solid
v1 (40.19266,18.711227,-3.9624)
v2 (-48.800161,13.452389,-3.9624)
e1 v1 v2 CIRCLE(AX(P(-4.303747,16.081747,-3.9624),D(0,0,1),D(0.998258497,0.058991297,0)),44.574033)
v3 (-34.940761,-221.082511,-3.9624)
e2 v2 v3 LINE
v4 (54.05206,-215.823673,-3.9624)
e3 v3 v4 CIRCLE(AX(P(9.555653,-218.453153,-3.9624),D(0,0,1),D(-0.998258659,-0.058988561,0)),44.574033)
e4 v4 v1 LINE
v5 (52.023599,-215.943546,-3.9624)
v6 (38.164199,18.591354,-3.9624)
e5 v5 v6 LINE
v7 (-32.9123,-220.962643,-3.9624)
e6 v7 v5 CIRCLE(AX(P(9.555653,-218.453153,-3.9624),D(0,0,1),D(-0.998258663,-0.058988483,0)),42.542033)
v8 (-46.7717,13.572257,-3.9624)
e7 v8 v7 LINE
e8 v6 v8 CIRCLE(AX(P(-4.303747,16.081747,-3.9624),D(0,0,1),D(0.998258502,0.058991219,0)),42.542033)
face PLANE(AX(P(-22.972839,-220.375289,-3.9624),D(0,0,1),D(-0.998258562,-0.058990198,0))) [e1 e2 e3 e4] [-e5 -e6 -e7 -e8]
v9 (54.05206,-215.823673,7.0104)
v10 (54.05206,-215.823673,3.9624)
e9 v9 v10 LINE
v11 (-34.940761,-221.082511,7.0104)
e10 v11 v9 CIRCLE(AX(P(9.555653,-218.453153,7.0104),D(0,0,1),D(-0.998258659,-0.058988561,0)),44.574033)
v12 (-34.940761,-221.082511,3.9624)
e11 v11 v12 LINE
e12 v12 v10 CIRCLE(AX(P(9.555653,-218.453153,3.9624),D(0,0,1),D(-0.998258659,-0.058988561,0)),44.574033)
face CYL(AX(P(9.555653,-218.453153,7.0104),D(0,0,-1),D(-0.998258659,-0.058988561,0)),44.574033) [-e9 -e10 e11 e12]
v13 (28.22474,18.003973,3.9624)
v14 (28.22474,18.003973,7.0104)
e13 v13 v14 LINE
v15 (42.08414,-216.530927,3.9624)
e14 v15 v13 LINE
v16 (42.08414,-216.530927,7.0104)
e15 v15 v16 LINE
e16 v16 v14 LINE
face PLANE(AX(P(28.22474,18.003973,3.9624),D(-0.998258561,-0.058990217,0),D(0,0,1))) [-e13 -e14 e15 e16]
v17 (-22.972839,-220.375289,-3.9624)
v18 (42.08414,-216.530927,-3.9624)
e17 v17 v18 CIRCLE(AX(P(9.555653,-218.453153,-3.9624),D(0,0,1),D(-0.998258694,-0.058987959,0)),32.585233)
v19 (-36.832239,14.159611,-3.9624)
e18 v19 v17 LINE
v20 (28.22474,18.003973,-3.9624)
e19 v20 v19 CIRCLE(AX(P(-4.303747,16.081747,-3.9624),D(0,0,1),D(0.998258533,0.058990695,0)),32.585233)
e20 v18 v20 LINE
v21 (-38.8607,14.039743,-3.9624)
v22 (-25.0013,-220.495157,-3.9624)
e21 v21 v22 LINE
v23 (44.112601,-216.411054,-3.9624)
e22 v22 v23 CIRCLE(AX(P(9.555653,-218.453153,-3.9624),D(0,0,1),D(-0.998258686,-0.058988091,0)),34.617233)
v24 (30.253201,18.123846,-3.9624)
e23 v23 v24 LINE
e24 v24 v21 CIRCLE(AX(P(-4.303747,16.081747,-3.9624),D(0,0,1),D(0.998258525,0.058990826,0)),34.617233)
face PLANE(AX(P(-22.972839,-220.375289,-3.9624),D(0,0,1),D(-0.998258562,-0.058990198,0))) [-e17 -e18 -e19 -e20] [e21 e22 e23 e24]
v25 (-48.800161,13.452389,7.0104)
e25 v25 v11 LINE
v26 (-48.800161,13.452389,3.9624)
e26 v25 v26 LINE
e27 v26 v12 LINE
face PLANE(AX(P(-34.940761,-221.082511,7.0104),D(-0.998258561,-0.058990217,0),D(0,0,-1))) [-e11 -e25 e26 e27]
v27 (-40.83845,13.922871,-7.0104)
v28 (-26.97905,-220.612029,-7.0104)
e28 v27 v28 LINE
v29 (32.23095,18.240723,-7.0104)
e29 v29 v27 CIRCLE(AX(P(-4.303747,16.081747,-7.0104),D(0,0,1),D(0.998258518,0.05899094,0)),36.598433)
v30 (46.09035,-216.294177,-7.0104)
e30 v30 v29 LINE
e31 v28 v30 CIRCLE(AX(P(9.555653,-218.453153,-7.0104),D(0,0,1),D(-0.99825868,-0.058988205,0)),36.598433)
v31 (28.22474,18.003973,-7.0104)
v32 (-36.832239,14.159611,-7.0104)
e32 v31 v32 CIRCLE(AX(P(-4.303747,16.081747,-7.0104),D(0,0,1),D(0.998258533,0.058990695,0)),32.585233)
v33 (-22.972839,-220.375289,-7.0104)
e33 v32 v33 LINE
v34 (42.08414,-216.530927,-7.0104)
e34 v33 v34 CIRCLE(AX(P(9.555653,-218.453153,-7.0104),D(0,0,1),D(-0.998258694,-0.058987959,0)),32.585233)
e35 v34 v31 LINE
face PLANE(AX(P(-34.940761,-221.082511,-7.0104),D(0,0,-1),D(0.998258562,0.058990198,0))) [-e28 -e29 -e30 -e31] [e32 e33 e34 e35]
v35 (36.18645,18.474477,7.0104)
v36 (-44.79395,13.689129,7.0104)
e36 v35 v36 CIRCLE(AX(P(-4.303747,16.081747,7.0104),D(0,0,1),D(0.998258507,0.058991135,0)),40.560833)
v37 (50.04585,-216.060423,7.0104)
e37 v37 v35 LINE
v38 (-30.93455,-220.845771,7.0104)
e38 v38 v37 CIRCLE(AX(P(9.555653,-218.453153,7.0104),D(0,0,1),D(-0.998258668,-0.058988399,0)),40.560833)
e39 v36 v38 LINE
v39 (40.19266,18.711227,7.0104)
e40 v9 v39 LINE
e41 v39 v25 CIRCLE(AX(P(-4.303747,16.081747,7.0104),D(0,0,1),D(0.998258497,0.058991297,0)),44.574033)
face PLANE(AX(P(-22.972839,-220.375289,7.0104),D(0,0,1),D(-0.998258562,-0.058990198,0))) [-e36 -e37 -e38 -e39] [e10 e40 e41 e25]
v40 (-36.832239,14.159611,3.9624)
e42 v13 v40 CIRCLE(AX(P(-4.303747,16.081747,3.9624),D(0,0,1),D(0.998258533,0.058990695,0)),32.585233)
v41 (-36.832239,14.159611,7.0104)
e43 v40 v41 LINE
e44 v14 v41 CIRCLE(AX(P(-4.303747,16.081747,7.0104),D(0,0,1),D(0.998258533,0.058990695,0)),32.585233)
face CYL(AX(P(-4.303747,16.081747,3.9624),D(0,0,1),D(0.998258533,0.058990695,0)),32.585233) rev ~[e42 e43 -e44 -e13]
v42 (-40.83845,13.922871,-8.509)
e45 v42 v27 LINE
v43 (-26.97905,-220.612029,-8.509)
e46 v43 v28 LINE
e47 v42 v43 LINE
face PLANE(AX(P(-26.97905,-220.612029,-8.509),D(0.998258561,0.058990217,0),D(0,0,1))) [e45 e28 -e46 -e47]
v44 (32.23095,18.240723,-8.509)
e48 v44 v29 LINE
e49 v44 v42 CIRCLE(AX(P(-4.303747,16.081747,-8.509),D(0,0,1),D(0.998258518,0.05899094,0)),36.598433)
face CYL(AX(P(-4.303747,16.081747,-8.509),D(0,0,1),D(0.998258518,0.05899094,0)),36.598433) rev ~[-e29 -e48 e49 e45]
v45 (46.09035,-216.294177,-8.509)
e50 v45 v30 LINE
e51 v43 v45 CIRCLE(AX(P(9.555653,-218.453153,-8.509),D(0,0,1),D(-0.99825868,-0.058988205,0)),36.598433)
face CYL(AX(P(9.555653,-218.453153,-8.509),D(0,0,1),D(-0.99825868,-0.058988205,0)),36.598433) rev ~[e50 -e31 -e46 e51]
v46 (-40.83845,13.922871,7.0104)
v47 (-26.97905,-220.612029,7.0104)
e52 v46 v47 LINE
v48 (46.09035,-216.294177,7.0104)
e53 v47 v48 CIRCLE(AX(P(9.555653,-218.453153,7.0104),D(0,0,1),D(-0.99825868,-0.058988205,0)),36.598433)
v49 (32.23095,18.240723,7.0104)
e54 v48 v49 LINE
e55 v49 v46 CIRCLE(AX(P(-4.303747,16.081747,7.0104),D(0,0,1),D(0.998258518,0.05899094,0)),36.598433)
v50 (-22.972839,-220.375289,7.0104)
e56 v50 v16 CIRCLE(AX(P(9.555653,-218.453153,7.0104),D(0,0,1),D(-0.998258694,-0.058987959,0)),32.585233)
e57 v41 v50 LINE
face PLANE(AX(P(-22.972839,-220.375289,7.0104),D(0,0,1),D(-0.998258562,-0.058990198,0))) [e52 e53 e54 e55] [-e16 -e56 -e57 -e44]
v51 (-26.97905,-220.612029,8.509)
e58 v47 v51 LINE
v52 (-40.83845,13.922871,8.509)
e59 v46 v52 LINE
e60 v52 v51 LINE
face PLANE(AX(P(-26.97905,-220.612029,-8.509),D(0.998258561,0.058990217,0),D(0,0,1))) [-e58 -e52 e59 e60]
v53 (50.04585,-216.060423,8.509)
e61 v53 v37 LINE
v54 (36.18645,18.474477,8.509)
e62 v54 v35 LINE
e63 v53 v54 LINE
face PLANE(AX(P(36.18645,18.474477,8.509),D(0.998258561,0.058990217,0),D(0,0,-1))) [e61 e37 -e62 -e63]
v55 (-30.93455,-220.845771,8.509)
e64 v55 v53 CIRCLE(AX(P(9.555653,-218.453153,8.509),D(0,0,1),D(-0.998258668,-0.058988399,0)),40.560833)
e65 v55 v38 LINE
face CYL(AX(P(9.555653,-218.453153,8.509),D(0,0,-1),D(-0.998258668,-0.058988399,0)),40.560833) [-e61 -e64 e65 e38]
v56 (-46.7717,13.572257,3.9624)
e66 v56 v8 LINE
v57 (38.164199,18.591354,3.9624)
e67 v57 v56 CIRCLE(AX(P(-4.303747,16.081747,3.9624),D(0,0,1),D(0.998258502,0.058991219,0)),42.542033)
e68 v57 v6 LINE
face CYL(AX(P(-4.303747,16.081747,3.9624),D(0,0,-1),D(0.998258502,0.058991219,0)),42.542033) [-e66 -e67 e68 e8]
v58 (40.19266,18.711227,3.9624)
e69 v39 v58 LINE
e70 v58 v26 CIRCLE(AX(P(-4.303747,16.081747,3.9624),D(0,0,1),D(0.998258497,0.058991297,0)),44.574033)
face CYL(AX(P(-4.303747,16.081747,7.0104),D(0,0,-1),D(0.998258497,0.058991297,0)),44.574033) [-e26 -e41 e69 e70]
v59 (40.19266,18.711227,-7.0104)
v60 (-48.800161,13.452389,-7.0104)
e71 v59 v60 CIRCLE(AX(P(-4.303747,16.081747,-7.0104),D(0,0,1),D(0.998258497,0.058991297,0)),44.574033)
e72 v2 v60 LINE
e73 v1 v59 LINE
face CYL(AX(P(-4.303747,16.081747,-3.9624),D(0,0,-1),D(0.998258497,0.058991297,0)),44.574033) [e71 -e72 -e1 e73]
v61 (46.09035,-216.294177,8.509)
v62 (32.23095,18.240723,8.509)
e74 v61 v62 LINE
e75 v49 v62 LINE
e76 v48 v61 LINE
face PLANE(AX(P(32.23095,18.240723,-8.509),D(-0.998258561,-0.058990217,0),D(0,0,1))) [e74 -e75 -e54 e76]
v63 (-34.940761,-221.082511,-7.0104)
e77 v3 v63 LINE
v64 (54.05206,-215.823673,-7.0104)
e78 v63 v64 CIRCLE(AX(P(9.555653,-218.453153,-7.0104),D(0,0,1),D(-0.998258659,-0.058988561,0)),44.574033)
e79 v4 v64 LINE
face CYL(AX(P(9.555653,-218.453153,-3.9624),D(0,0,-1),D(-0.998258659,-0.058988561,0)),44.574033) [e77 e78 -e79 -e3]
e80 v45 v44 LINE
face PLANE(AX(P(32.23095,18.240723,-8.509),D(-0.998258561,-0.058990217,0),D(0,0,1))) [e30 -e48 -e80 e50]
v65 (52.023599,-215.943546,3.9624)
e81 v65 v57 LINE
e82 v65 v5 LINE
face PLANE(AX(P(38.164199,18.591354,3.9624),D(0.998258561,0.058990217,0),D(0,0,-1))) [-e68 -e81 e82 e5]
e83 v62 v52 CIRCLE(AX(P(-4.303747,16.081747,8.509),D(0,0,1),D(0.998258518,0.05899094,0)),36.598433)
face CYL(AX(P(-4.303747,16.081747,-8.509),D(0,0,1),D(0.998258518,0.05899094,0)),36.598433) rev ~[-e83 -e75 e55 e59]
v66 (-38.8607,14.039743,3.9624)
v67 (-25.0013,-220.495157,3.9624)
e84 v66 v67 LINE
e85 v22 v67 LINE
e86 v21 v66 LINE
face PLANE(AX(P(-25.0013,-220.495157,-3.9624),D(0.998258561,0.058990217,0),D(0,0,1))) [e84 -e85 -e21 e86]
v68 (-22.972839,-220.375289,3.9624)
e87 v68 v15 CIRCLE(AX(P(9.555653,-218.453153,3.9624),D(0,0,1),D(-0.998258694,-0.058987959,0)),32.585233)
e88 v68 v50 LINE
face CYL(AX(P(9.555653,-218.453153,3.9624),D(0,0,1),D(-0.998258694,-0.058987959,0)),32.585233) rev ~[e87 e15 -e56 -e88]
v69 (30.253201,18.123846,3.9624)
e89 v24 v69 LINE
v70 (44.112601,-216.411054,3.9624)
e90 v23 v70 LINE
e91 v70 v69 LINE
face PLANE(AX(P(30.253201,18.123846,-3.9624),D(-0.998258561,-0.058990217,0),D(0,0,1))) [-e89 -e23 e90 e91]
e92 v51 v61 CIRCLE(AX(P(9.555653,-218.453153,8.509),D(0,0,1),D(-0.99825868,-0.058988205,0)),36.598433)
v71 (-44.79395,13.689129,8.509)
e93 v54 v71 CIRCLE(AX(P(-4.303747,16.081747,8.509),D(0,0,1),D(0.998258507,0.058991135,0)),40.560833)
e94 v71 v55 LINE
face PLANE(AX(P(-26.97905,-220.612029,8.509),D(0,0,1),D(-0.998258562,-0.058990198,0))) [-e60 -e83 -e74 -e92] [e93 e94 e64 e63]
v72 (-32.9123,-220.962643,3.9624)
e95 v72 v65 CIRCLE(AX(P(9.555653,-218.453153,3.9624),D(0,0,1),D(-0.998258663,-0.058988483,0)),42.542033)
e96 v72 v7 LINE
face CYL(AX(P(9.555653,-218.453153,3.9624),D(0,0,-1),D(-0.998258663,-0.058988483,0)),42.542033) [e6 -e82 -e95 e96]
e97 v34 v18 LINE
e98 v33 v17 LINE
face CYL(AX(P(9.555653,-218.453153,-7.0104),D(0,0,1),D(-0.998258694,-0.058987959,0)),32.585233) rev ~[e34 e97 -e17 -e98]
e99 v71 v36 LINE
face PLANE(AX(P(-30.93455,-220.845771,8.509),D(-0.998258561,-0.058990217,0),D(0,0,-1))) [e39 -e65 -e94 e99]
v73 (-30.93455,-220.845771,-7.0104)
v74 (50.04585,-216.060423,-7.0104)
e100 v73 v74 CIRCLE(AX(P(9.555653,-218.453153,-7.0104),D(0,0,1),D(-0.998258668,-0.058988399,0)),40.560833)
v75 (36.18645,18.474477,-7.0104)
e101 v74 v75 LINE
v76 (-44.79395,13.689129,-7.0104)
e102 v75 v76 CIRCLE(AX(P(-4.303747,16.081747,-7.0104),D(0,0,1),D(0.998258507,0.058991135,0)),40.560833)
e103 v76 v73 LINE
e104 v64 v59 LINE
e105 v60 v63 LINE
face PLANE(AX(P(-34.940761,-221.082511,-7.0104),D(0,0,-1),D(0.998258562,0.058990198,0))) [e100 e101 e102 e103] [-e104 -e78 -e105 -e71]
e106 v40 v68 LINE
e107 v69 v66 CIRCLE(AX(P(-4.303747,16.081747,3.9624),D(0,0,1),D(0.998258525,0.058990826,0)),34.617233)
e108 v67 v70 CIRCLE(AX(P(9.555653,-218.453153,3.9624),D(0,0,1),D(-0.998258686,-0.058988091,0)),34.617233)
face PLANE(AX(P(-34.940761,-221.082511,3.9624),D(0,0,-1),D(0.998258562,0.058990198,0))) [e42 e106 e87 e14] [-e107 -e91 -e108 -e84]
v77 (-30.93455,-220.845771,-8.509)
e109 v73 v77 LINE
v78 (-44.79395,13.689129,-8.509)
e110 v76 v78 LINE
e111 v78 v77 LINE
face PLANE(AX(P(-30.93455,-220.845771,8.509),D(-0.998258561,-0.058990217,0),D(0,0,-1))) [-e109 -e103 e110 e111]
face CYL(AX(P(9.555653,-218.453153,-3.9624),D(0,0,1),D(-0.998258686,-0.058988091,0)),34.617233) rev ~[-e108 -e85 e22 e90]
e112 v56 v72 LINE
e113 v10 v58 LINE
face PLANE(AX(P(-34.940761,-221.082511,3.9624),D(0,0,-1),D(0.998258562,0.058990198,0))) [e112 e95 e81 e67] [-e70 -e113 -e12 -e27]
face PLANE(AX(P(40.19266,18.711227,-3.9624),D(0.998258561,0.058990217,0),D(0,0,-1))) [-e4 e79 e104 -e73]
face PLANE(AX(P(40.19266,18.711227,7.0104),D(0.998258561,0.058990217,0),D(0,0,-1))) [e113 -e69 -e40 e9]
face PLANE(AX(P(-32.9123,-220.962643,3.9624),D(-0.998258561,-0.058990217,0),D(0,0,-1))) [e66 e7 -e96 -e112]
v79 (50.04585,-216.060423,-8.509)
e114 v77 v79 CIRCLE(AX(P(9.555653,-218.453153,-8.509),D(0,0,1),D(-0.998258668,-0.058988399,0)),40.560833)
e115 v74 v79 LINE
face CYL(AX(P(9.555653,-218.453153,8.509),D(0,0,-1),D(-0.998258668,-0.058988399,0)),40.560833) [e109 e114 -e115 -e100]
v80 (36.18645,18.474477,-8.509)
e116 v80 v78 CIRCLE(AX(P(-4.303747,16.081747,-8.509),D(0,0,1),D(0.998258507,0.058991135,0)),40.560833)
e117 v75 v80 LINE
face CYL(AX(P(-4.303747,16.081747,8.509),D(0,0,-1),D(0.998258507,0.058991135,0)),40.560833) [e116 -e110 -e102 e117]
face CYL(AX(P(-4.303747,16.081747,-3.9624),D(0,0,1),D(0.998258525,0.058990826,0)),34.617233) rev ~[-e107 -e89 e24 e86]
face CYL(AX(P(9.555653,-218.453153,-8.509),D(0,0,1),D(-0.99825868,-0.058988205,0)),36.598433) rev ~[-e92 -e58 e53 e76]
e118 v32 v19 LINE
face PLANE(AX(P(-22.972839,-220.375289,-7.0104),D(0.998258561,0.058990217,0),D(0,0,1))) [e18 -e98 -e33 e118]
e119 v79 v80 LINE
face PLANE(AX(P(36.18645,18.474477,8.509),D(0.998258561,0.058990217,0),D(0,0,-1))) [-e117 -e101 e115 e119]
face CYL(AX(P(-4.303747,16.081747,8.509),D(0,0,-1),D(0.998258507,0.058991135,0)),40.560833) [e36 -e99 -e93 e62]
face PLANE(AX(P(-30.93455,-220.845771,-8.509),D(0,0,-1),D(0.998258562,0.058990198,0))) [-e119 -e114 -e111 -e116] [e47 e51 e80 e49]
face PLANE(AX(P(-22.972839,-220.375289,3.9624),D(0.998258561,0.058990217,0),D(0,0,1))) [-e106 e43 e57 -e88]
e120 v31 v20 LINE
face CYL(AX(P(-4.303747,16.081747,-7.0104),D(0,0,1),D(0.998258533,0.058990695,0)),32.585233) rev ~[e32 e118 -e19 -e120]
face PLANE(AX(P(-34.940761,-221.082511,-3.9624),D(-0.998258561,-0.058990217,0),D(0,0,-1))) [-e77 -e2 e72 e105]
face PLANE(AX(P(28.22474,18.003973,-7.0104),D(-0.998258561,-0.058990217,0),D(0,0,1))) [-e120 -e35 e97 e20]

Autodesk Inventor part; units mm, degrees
ref_plane "Work Plane2" through (-4.3037, 16.0818, 0) normal (-1, 0, 0) x (0, 0, 1)
ref_plane "Work Plane3" through (9.5557, -218.4531, 0) normal (0.2454855, 0.9694003, 0) x (0, 0, 1)
sketch "Path" plane through (0, 0, 0) normal (0, 0, 1) x (1, 0, 0)
  arc A0 (34.2087, 18.3576) -> (-42.8162, 13.806) centre (-4.3037, 16.0818) ccw
  arc A1 (-28.9568, -220.7289) -> (48.0681, -216.1773) centre (9.5557, -218.4531) ccw
  line L0 (-28.9568, -220.7289) -> (-42.8162, 13.806)
  line L1 (34.2087, 18.3576) -> (48.0681, -216.1773)
  dimension "d31" = 11.9888
ref_plane "Section Plane" through (-42.8162, 13.806, 0) normal (0.0589902, -0.9982586, 0) x (0, 0, 1)
sketch "Section Sketch" plane through (-42.8162, 13.806, 0) normal (0.0589902, -0.9982586, 0) x (0, 0, 1)
  line L0 (-8.509, -1.9812) -> (8.509, -1.9812)
  line L1 (8.509, -1.9812) -> (8.509, 1.9812)
  line L2 (8.509, 1.9812) -> (-8.509, 1.9812)
  line L3 (-8.509, 1.9812) -> (-8.509, -1.9812)
  line L4 (-3.9624, -3.9624) -> (3.9624, -3.9624)
  line L5 (3.9624, -3.9624) -> (3.9624, 3.9624)
  line L6 (3.9624, 3.9624) -> (-3.9624, 3.9624)
  line L7 (-3.9624, 3.9624) -> (-3.9624, -3.9624)
  line L8 (-3.9624, 0) -> (3.9624, 0) construction
  line L9 (-7.0104, -5.9944) -> (-3.9624, -5.9944)
  line L10 (-3.9624, -5.9944) -> (-3.9624, 5.9944)
  line L11 (-3.9624, 5.9944) -> (-7.0104, 5.9944)
  line L12 (-7.0104, 5.9944) -> (-7.0104, -5.9944)
  line L13 (3.9624, -5.9944) -> (7.0104, -5.9944)
  line L14 (7.0104, -5.9944) -> (7.0104, 5.9944)
  line L15 (7.0104, 5.9944) -> (3.9624, 5.9944)
  line L16 (3.9624, 5.9944) -> (3.9624, -5.9944)
  line L17 (-8.509, 0) -> (8.509, 0) construction
  point P0 (0, 0)
  point P1 (0, 0)
  dimension "d21" = 3.9624
  dimension "d22" = 7.9248
  dimension "d23" = 7.9248
  dimension "d24" = 3.048
  dimension "d31" = 11.9888
  dimension "d32" = 17.018
sweep "Solid" add profiles "Section Sketch" path "Path"
pattern_of_one "Strand Pattern"
equation "\"d21\" = da_d2"
equation "\"d22\" = da_d1"
equation "\"d23\" = da_b1"
equation "\"d24\" = da_t1 + da_t2"
equation "\"d30\" = da_pt"
equation "\"da_p\" = 12.7"
equation "\"da_b1\" = 7.9248"
equation "\"da_h2\" = 11.9888"
equation "\"da_h3\" = 10.3886"
equation "\"da_d1\" = 7.9248"
equation "\"da_d2\" = 3.9624"
equation "\"da_pt\" = 14.3764"
equation "\"da_b\" = 17.018"
equation "\"da_t1\" = 1.524"
equation "\"da_t2\" = 1.524"
properties part number "Roller Chain"
